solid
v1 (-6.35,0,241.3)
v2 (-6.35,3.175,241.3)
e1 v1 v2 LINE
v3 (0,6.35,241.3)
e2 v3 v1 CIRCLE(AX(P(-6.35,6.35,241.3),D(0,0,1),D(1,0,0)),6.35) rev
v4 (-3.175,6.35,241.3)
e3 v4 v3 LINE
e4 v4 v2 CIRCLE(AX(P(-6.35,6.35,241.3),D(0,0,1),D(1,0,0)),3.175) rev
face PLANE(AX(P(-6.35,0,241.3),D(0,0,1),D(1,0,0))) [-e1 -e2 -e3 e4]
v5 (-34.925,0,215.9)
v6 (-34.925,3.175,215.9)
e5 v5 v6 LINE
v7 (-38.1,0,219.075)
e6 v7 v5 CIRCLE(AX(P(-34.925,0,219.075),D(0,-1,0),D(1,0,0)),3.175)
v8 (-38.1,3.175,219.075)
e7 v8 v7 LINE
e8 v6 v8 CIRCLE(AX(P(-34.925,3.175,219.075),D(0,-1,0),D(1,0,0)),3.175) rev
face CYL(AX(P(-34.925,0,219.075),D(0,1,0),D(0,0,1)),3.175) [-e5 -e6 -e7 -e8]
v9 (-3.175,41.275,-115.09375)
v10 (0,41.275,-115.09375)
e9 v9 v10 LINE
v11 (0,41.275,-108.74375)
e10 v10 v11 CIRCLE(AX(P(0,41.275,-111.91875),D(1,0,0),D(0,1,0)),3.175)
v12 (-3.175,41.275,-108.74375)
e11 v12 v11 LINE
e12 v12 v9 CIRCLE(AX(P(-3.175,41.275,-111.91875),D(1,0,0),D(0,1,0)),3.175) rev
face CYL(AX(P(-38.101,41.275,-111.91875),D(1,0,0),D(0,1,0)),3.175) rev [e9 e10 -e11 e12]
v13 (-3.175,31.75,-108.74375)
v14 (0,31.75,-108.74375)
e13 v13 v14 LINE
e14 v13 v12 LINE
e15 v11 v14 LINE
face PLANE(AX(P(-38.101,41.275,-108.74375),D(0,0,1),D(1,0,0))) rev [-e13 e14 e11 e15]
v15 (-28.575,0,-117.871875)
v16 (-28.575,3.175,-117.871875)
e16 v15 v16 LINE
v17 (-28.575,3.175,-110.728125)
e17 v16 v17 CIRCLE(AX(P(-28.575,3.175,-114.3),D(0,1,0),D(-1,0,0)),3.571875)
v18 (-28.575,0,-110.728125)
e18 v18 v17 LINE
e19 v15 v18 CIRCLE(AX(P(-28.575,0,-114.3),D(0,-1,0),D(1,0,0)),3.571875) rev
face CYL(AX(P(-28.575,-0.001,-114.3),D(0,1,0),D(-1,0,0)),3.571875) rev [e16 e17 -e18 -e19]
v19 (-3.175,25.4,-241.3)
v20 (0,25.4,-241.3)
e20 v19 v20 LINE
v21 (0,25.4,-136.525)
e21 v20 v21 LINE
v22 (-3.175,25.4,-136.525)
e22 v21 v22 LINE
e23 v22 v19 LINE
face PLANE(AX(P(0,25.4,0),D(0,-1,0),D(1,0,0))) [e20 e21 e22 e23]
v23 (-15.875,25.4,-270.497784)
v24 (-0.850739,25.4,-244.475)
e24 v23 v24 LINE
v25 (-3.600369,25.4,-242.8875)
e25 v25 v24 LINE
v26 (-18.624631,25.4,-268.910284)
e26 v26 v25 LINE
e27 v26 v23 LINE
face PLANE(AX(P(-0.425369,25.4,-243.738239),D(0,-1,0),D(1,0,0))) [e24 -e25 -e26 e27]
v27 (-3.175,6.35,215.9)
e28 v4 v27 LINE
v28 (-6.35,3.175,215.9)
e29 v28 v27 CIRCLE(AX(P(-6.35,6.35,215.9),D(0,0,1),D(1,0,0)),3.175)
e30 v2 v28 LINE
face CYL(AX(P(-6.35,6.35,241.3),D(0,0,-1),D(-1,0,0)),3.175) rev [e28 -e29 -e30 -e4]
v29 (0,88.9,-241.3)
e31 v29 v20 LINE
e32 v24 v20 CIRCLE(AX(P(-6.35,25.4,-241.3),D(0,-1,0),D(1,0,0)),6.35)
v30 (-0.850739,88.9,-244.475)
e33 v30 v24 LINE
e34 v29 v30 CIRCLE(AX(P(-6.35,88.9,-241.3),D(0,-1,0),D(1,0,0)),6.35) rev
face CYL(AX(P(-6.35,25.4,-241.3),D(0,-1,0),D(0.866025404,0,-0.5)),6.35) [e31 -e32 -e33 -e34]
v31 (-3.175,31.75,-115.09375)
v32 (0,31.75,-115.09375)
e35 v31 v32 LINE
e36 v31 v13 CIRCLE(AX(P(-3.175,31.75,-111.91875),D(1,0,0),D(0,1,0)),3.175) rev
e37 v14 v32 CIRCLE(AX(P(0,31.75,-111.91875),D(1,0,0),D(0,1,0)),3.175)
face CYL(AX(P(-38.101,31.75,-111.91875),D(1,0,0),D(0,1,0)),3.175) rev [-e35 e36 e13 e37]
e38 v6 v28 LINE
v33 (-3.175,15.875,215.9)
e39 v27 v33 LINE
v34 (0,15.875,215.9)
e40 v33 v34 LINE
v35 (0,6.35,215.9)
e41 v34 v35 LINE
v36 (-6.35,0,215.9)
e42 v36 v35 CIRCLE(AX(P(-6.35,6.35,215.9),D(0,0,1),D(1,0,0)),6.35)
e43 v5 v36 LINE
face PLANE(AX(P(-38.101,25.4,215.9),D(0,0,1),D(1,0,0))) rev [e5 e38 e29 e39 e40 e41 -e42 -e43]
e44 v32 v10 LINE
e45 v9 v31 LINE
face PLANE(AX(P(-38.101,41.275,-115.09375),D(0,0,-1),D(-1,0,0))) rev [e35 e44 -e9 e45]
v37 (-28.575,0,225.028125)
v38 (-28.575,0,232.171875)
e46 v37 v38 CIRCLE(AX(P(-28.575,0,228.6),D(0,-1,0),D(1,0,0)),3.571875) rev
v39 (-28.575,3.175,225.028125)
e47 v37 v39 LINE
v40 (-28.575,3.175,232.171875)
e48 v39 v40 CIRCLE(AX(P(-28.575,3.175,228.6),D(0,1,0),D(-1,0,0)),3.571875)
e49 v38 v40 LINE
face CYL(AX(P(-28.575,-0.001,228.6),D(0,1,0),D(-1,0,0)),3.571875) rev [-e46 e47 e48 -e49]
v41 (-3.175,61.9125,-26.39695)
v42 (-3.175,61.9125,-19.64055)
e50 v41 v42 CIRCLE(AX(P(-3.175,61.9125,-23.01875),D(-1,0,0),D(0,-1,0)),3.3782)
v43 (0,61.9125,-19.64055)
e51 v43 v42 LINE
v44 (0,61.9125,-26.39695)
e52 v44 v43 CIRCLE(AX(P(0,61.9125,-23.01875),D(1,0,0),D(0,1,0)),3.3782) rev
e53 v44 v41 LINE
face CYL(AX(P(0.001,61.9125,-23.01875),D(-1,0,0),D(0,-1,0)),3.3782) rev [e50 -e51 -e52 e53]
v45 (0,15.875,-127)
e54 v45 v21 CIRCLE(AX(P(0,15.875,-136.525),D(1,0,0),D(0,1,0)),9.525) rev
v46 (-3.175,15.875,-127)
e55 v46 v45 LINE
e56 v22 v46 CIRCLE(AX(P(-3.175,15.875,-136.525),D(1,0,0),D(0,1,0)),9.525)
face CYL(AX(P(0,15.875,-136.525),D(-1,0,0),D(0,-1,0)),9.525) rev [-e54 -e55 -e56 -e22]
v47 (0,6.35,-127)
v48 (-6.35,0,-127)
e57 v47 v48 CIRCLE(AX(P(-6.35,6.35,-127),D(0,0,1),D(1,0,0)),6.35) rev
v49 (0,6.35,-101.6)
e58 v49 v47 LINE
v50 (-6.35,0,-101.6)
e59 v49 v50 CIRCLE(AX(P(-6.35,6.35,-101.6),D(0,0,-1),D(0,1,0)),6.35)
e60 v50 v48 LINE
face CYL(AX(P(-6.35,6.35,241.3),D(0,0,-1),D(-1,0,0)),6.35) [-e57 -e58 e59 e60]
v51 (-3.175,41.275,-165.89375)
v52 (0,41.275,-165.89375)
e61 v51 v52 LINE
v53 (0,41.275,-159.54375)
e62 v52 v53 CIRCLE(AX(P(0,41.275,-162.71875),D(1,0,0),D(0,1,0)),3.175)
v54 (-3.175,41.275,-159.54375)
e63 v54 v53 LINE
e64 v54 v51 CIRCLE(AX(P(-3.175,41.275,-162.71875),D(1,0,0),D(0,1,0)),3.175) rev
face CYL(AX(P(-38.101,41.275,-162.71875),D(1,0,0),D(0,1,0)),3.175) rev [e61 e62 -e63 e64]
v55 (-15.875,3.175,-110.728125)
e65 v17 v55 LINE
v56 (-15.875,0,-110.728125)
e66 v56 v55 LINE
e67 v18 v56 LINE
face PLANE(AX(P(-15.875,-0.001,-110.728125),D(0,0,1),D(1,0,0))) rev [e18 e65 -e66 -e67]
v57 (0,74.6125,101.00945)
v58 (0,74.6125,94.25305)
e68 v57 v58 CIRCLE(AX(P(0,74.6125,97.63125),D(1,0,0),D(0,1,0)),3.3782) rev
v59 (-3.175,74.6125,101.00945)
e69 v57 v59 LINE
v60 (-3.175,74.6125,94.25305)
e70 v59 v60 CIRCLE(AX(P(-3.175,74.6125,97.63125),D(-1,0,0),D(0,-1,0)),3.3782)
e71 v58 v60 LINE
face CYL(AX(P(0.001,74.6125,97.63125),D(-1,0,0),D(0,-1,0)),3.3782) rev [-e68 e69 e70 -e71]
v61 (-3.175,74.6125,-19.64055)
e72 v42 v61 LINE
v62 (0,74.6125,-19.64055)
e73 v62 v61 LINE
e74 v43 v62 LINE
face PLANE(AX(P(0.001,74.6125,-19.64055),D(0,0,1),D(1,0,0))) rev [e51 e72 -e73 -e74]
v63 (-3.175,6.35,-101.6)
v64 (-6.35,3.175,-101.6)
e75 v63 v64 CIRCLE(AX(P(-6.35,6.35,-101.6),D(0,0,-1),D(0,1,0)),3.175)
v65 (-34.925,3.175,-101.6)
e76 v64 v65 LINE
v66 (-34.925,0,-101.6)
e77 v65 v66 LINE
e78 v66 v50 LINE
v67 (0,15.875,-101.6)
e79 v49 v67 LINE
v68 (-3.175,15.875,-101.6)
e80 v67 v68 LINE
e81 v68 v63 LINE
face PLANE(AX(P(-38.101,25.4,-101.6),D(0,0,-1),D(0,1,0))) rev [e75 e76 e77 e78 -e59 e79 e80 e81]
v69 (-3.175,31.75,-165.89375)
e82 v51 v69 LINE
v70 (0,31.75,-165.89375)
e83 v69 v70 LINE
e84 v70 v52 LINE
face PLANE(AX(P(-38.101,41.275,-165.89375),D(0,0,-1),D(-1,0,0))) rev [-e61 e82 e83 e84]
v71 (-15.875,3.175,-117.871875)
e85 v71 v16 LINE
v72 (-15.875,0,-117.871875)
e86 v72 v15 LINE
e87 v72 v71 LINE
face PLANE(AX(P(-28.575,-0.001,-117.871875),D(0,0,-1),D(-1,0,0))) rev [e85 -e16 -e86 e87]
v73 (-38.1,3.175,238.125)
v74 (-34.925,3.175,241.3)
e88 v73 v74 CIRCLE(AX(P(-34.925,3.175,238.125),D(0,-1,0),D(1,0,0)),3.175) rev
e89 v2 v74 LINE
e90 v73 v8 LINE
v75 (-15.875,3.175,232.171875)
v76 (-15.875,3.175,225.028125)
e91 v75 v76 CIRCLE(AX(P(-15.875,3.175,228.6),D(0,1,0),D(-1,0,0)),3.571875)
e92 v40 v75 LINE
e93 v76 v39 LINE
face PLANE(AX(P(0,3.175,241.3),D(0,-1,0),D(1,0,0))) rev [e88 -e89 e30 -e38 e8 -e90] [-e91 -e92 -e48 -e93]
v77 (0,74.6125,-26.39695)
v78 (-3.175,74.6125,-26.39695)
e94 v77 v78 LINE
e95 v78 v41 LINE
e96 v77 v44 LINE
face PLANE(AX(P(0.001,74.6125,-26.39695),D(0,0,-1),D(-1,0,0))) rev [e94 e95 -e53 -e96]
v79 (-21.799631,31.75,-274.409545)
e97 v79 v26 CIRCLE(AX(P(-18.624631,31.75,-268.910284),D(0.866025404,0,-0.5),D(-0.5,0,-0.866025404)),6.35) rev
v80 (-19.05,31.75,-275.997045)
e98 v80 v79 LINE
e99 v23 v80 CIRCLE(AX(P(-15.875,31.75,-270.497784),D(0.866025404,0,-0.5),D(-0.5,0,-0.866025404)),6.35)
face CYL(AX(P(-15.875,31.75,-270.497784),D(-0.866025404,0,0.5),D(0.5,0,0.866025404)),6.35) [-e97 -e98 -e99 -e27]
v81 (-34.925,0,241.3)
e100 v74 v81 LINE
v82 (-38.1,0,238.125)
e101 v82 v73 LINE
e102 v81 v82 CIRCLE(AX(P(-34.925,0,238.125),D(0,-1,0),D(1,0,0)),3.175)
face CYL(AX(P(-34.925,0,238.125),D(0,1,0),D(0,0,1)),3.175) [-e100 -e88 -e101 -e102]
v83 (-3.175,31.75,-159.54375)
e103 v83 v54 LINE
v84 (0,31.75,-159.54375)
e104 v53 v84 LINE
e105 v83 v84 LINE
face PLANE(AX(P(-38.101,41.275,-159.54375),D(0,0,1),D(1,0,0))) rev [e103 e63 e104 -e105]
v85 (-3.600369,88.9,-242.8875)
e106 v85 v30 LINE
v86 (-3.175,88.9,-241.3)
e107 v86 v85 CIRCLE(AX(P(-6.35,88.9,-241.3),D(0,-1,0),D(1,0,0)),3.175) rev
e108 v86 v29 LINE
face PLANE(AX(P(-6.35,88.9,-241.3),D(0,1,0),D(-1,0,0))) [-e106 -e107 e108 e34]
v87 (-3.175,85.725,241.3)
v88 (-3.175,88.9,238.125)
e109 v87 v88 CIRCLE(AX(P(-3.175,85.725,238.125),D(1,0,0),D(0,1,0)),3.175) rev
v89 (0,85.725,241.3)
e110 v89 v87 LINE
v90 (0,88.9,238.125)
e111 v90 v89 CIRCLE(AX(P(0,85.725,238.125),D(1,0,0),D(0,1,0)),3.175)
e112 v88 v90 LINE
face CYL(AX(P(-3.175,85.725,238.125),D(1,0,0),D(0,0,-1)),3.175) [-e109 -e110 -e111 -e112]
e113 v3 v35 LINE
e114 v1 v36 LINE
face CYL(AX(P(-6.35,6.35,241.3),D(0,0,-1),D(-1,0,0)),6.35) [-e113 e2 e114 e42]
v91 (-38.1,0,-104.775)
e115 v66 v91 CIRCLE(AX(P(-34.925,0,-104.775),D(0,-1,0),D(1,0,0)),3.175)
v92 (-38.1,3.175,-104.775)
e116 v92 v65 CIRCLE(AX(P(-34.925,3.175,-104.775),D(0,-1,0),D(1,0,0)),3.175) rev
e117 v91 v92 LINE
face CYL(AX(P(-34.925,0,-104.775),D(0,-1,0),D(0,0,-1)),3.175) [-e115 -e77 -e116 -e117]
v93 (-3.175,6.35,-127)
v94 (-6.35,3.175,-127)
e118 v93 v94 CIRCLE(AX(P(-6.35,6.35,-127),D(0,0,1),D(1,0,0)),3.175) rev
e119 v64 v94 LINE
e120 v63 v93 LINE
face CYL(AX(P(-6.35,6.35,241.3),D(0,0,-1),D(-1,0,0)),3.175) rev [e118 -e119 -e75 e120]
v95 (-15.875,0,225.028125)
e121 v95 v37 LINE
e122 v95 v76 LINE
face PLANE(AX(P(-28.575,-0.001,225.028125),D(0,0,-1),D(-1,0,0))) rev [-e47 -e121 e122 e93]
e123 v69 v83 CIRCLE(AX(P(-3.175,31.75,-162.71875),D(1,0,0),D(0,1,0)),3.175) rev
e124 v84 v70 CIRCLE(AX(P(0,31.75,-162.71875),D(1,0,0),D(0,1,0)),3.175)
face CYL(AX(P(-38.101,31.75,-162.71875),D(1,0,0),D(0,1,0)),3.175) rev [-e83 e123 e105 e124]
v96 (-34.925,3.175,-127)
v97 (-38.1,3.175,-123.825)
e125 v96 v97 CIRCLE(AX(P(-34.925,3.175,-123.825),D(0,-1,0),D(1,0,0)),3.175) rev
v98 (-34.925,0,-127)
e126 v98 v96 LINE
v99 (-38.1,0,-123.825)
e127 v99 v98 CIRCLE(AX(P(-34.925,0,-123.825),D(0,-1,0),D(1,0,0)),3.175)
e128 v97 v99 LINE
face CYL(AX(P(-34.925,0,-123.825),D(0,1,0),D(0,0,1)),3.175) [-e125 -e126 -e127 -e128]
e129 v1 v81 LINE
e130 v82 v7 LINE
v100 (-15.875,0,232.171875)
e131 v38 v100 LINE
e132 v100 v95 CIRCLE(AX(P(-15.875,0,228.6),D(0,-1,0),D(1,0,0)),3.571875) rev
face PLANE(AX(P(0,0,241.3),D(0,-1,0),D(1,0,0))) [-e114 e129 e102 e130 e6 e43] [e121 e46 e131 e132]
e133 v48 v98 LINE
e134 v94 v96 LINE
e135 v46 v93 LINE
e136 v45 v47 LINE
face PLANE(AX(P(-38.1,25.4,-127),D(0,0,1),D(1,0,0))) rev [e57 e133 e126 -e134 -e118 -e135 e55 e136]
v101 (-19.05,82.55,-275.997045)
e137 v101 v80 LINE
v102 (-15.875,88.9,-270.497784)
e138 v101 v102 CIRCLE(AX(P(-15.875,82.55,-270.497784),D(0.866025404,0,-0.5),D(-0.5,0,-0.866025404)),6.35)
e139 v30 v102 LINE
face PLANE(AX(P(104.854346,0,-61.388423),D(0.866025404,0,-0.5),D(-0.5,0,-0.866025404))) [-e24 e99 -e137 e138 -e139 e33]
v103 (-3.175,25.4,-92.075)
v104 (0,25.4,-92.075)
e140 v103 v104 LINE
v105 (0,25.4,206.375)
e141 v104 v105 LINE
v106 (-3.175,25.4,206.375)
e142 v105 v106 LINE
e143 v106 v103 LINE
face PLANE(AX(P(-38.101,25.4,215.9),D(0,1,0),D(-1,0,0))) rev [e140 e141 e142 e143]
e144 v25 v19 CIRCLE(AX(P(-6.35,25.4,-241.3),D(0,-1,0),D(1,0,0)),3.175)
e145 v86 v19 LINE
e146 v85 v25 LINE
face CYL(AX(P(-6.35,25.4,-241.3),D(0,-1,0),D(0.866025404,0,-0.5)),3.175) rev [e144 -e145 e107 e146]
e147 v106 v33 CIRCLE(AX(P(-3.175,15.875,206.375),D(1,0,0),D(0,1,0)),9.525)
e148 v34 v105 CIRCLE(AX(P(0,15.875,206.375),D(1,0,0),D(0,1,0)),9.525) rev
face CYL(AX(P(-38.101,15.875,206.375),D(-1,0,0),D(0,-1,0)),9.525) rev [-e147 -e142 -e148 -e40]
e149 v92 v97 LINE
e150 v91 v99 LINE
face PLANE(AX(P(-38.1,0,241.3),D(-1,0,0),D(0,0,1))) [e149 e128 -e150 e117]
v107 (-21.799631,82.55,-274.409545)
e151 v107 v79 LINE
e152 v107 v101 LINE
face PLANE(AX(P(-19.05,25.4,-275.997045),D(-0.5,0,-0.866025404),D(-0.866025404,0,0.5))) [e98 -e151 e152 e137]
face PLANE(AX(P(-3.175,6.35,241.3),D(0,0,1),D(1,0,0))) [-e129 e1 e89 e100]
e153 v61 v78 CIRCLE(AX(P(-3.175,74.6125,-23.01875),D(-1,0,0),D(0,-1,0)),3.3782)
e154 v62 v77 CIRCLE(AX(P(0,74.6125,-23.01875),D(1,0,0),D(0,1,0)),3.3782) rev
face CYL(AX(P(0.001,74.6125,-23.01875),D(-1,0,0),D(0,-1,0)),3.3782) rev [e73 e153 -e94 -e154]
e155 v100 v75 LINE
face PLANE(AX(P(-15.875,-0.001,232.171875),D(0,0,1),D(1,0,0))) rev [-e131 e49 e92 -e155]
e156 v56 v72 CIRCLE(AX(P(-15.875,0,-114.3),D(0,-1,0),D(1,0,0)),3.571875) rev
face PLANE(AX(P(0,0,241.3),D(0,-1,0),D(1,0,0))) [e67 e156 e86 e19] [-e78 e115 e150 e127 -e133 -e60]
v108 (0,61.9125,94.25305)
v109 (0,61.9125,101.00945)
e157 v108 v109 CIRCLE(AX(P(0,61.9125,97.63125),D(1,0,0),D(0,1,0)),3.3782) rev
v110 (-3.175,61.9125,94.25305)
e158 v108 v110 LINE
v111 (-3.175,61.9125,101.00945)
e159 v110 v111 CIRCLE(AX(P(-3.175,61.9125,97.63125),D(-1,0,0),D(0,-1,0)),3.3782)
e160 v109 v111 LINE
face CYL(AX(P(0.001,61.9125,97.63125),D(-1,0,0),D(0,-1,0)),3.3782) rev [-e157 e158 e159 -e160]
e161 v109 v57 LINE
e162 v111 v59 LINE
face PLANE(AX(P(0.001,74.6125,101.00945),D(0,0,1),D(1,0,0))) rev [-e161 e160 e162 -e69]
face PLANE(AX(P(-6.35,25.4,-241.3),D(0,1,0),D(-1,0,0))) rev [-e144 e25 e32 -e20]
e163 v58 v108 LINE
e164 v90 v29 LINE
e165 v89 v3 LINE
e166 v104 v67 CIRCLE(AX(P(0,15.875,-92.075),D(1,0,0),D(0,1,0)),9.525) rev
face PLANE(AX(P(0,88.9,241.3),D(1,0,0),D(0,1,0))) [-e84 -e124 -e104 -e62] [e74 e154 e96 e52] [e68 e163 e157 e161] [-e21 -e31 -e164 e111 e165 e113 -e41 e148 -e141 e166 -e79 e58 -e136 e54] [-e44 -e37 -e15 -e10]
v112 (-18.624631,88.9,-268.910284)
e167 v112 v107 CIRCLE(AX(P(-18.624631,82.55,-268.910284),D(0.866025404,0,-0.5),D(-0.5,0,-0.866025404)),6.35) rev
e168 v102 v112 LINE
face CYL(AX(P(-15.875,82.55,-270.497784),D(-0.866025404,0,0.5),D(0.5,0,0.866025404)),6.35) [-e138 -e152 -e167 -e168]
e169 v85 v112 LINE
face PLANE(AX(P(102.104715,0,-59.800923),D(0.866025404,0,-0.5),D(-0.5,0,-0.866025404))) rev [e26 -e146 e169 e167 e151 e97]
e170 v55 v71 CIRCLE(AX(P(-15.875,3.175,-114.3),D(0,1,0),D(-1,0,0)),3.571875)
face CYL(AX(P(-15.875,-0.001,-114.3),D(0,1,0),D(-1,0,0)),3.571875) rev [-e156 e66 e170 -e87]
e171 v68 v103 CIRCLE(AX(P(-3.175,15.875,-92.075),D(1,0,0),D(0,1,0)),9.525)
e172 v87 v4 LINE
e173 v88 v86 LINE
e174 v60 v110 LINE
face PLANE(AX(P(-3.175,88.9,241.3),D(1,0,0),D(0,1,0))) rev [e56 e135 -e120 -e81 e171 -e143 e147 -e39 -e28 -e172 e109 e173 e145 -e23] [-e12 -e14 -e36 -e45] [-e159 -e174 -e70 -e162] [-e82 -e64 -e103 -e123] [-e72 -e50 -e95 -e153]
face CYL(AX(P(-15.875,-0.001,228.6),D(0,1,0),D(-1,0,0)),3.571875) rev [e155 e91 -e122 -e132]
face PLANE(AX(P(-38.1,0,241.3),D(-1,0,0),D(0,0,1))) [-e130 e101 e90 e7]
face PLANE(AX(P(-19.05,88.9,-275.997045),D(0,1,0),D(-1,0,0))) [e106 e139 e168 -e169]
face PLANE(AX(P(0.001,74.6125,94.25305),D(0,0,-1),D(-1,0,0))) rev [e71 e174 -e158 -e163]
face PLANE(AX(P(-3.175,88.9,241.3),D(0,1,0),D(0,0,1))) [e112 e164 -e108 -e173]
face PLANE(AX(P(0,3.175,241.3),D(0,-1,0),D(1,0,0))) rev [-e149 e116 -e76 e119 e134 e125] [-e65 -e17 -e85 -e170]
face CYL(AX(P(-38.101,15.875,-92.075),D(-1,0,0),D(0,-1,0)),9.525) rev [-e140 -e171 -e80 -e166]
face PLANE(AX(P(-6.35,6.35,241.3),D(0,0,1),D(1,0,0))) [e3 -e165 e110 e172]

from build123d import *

# Parameters (mm, degrees)
BASE_FLANGE1_DEPTH             = 241.3
SKETCH7_W                      = 38.1
SKETCH7_H                      = 114.3
CUT_EXTRUDE2_DEPTH             = 25.4
EDGE_FLANGE1_DEPTH             = 63.5
FILLET2_R                      = 6.35
F_3_16_0_1875_DIAMETER_HOLE2_D = 4.7625
CUT_EXTRUDE1_REACH             = 293.504
CUT_EXTRUDE3_REACH             = 294.454
CUT_EXTRUDE4_REACH             = 294.454
SKETCH12_W                     = 317.5
SKETCH12_H                     = 25.4
FILLET1_R                      = 3.175
FILLET3_R                      = 9.525
CUT_EXTRUDE5_REACH             = 294.057


# Sheet-metal steps are written as plain solids
with BuildPart() as part:
    # Sketch1 → Base-Flange1 (new, symmetric)
    with BuildSketch(Plane.XY):
        with BuildLine():
            Line((0, 88.9), (0, 6.35))
            ThreePointArc((0, 6.35), (-1.859871939, 1.859871939), (-6.35, 0))
            Line((-6.35, 0), (-38.1, 0))
            Line((-38.1, 0), (-38.1, 3.175))
            Line((-38.1, 3.175), (-6.35, 3.175))
            ThreePointArc((-6.35, 3.175), (-4.10493597, 4.10493597), (-3.175, 6.35))
            Line((-3.175, 6.35), (-3.175, 88.9))
            Line((-3.175, 88.9), (0, 88.9))
        make_face()
    extrude(amount=BASE_FLANGE1_DEPTH, both=True)

    # Sketch7 → Cut-Extrude2 (cut)
    with BuildSketch(Plane.XZ):
        with Locations((-19.05, -184.15)):
            Rectangle(SKETCH7_W, SKETCH7_H)
    extrude(amount=-CUT_EXTRUDE2_DEPTH, mode=Mode.SUBTRACT)

    # Edge-Flange1 section (across the edge) → Edge-Flange1 (add)
    with BuildSketch(Plane(origin=(-3.175, 88.9, -242.150738686), x_dir=(-0.8660254037844416, 0, 0.49999999999999495), z_dir=(0, -1, 0))):
        with BuildLine():
            Line((-3.175, 0.850738686), (-3.175, 37.249261314))
            Line((-3.175, 37.249261314), (0, 37.249261314))
            Line((0, 37.249261314), (0, 0.850738686))
            ThreePointArc((0, 0.850738686), (0.108185502, 0.028988218), (0.425369343, -0.736761314))
            Line((0.425369343, -0.736761314), (-2.324261314, -2.324261314))
            ThreePointArc((-2.324261314, -2.324261314), (-2.958628997, -0.79276225), (-3.175, 0.850738686))
        make_face()
    extrude(amount=EDGE_FLANGE1_DEPTH)

    # Fillet2
    fillet2_edges = [part.edges().sort_by_distance(p)[0] for p in [
        (-20.424815329, 88.9, -275.203295256),
        (-20.424815329, 25.4, -275.203295256),
    ]]
    fillet(fillet2_edges, radius=FILLET2_R)

    # 3/16 (0.1875) Diameter Hole2 (through all)
    with Locations(Plane(origin=(0, 0, 0), x_dir=(0, 0, -1), z_dir=(1, 0, 0))):
        with Locations((111.91875, 36.5125), (162.71875, 36.5125)):
            Hole(F_3_16_0_1875_DIAMETER_HOLE2_D / 2)

    # Sketch5 → Cut-Extrude1 (cut, up to next)
    with BuildSketch(Plane(origin=(0, 3.175, 0), x_dir=(-1, 0, 0), z_dir=(0, 1, 0)), mode=Mode.PRIVATE) as cut_extrude1_sk1:
        with BuildLine():
            Line((28.575, -117.871875), (15.875, -117.871875))
            ThreePointArc((15.875, -117.871875), (12.303125, -114.3), (15.875, -110.728125))
            Line((15.875, -110.728125), (28.575, -110.728125))
            ThreePointArc((28.575, -110.728125), (32.146875, -114.3), (28.575, -117.871875))
        make_face()
    cut_extrude1_tool1 = extrude(cut_extrude1_sk1.sketch, amount=-CUT_EXTRUDE1_REACH, mode=Mode.PRIVATE) & part.part
    # Sketch5 → Cut-Extrude1 (cut, up to next)
    with BuildSketch(Plane(origin=(0, 3.175, 0), x_dir=(-1, 0, 0), z_dir=(0, 1, 0)), mode=Mode.PRIVATE) as cut_extrude1_sk2:
        with BuildLine():
            Line((28.575, 225.028125), (15.875, 225.028125))
            ThreePointArc((15.875, 225.028125), (12.303125, 228.6), (15.875, 232.171875))
            Line((15.875, 232.171875), (28.575, 232.171875))
            ThreePointArc((28.575, 232.171875), (32.146875, 228.6), (28.575, 225.028125))
        make_face()
    cut_extrude1_tool2 = extrude(cut_extrude1_sk2.sketch, amount=-CUT_EXTRUDE1_REACH, mode=Mode.PRIVATE) & part.part
    add(cut_extrude1_tool1.solids().sort_by_distance((-22.225, 3.175, -114.3))[0], mode=Mode.SUBTRACT)
    add(cut_extrude1_tool2.solids().sort_by_distance((-22.225, 3.175, 228.6))[0], mode=Mode.SUBTRACT)

    # Sketch11 → Cut-Extrude3 (cut, up to next)
    with BuildSketch(Plane(origin=(0, 0, 0), x_dir=(0, 0, -1), z_dir=(1, 0, 0)), mode=Mode.PRIVATE) as cut_extrude3_sk1:
        with BuildLine():
            Line((115.09375, 41.275), (115.09375, 31.75))
            ThreePointArc((115.09375, 31.75), (111.91875, 28.575), (108.74375, 31.75))
            Line((108.74375, 31.75), (108.74375, 41.275))
            ThreePointArc((108.74375, 41.275), (111.91875, 44.45), (115.09375, 41.275))
        make_face()
    cut_extrude3_tool1 = extrude(cut_extrude3_sk1.sketch, amount=-CUT_EXTRUDE3_REACH, mode=Mode.PRIVATE) & part.part
    # Sketch11 → Cut-Extrude3 (cut, up to next)
    with BuildSketch(Plane(origin=(0, 0, 0), x_dir=(0, 0, -1), z_dir=(1, 0, 0)), mode=Mode.PRIVATE) as cut_extrude3_sk2:
        with BuildLine():
            Line((165.89375, 41.275), (165.89375, 31.75))
            ThreePointArc((165.89375, 31.75), (162.71875, 28.575), (159.54375, 31.75))
            Line((159.54375, 31.75), (159.54375, 41.275))
            ThreePointArc((159.54375, 41.275), (162.71875, 44.45), (165.89375, 41.275))
        make_face()
    cut_extrude3_tool2 = extrude(cut_extrude3_sk2.sketch, amount=-CUT_EXTRUDE3_REACH, mode=Mode.PRIVATE) & part.part
    add(cut_extrude3_tool1.solids().sort_by_distance((0, 36.5125, -111.91875))[0], mode=Mode.SUBTRACT)
    add(cut_extrude3_tool2.solids().sort_by_distance((0, 36.5125, -162.71875))[0], mode=Mode.SUBTRACT)

    # Sketch12 → Cut-Extrude4 (cut, up to next)
    with BuildSketch(Plane(origin=(0, 0, 0), x_dir=(0, 0, -1), z_dir=(1, 0, 0)), mode=Mode.PRIVATE) as cut_extrude4_sk1:
        with Locations((-57.15, 12.7)):
            Rectangle(SKETCH12_W, SKETCH12_H)
    cut_extrude4_tool1 = extrude(cut_extrude4_sk1.sketch, amount=-CUT_EXTRUDE4_REACH, mode=Mode.PRIVATE) & part.part
    add(cut_extrude4_tool1.solids().sort_by_distance((0, 12.7, 57.15))[0], mode=Mode.SUBTRACT)

    # Fillet1
    fillet1_edges = [part.edges().sort_by_distance(p)[0] for p in [
        (-38.1, 1.5875, 215.9),
        (-38.1, 1.5875, -101.6),
        (-1.5875, 88.9, 241.3),
        (-38.1, 1.5875, -127),
        (-38.1, 1.5875, 241.3),
    ]]
    fillet(fillet1_edges, radius=FILLET1_R)

    # Fillet3
    fillet3_edges = [part.edges().sort_by_distance(p)[0] for p in [
        (-1.5875, 25.4, 215.9),
        (-1.5875, 25.4, -101.6),
        (-1.5875, 25.4, -127),
    ]]
    fillet(fillet3_edges, radius=FILLET3_R)

    # Sketch13 → Cut-Extrude5 (cut, up to next)
    with BuildSketch(Plane.ZY.offset(3.175), mode=Mode.PRIVATE) as cut_extrude5_sk1:
        with BuildLine():
            Line((-19.64055, 74.6125), (-19.64055, 61.9125))
            ThreePointArc((-19.64055, 61.9125), (-23.01875, 58.5343), (-26.39695, 61.9125))
            Line((-26.39695, 61.9125), (-26.39695, 74.6125))
            ThreePointArc((-26.39695, 74.6125), (-23.01875, 77.9907), (-19.64055, 74.6125))
        make_face()
    cut_extrude5_tool1 = extrude(cut_extrude5_sk1.sketch, amount=-CUT_EXTRUDE5_REACH, mode=Mode.PRIVATE) & part.part
    # Sketch13 → Cut-Extrude5 (cut, up to next)
    with BuildSketch(Plane.ZY.offset(3.175), mode=Mode.PRIVATE) as cut_extrude5_sk2:
        with BuildLine():
            Line((101.00945, 74.6125), (101.00945, 61.9125))
            ThreePointArc((101.00945, 61.9125), (97.63125, 58.5343), (94.25305, 61.9125))
            Line((94.25305, 61.9125), (94.25305, 74.6125))
            ThreePointArc((94.25305, 74.6125), (97.63125, 77.9907), (101.00945, 74.6125))
        make_face()
    cut_extrude5_tool2 = extrude(cut_extrude5_sk2.sketch, amount=-CUT_EXTRUDE5_REACH, mode=Mode.PRIVATE) & part.part
    add(cut_extrude5_tool1.solids().sort_by_distance((-3.175, 68.2625, -23.01875))[0], mode=Mode.SUBTRACT)
    add(cut_extrude5_tool2.solids().sort_by_distance((-3.175, 68.2625, 97.63125))[0], mode=Mode.SUBTRACT)


solid = part.part
